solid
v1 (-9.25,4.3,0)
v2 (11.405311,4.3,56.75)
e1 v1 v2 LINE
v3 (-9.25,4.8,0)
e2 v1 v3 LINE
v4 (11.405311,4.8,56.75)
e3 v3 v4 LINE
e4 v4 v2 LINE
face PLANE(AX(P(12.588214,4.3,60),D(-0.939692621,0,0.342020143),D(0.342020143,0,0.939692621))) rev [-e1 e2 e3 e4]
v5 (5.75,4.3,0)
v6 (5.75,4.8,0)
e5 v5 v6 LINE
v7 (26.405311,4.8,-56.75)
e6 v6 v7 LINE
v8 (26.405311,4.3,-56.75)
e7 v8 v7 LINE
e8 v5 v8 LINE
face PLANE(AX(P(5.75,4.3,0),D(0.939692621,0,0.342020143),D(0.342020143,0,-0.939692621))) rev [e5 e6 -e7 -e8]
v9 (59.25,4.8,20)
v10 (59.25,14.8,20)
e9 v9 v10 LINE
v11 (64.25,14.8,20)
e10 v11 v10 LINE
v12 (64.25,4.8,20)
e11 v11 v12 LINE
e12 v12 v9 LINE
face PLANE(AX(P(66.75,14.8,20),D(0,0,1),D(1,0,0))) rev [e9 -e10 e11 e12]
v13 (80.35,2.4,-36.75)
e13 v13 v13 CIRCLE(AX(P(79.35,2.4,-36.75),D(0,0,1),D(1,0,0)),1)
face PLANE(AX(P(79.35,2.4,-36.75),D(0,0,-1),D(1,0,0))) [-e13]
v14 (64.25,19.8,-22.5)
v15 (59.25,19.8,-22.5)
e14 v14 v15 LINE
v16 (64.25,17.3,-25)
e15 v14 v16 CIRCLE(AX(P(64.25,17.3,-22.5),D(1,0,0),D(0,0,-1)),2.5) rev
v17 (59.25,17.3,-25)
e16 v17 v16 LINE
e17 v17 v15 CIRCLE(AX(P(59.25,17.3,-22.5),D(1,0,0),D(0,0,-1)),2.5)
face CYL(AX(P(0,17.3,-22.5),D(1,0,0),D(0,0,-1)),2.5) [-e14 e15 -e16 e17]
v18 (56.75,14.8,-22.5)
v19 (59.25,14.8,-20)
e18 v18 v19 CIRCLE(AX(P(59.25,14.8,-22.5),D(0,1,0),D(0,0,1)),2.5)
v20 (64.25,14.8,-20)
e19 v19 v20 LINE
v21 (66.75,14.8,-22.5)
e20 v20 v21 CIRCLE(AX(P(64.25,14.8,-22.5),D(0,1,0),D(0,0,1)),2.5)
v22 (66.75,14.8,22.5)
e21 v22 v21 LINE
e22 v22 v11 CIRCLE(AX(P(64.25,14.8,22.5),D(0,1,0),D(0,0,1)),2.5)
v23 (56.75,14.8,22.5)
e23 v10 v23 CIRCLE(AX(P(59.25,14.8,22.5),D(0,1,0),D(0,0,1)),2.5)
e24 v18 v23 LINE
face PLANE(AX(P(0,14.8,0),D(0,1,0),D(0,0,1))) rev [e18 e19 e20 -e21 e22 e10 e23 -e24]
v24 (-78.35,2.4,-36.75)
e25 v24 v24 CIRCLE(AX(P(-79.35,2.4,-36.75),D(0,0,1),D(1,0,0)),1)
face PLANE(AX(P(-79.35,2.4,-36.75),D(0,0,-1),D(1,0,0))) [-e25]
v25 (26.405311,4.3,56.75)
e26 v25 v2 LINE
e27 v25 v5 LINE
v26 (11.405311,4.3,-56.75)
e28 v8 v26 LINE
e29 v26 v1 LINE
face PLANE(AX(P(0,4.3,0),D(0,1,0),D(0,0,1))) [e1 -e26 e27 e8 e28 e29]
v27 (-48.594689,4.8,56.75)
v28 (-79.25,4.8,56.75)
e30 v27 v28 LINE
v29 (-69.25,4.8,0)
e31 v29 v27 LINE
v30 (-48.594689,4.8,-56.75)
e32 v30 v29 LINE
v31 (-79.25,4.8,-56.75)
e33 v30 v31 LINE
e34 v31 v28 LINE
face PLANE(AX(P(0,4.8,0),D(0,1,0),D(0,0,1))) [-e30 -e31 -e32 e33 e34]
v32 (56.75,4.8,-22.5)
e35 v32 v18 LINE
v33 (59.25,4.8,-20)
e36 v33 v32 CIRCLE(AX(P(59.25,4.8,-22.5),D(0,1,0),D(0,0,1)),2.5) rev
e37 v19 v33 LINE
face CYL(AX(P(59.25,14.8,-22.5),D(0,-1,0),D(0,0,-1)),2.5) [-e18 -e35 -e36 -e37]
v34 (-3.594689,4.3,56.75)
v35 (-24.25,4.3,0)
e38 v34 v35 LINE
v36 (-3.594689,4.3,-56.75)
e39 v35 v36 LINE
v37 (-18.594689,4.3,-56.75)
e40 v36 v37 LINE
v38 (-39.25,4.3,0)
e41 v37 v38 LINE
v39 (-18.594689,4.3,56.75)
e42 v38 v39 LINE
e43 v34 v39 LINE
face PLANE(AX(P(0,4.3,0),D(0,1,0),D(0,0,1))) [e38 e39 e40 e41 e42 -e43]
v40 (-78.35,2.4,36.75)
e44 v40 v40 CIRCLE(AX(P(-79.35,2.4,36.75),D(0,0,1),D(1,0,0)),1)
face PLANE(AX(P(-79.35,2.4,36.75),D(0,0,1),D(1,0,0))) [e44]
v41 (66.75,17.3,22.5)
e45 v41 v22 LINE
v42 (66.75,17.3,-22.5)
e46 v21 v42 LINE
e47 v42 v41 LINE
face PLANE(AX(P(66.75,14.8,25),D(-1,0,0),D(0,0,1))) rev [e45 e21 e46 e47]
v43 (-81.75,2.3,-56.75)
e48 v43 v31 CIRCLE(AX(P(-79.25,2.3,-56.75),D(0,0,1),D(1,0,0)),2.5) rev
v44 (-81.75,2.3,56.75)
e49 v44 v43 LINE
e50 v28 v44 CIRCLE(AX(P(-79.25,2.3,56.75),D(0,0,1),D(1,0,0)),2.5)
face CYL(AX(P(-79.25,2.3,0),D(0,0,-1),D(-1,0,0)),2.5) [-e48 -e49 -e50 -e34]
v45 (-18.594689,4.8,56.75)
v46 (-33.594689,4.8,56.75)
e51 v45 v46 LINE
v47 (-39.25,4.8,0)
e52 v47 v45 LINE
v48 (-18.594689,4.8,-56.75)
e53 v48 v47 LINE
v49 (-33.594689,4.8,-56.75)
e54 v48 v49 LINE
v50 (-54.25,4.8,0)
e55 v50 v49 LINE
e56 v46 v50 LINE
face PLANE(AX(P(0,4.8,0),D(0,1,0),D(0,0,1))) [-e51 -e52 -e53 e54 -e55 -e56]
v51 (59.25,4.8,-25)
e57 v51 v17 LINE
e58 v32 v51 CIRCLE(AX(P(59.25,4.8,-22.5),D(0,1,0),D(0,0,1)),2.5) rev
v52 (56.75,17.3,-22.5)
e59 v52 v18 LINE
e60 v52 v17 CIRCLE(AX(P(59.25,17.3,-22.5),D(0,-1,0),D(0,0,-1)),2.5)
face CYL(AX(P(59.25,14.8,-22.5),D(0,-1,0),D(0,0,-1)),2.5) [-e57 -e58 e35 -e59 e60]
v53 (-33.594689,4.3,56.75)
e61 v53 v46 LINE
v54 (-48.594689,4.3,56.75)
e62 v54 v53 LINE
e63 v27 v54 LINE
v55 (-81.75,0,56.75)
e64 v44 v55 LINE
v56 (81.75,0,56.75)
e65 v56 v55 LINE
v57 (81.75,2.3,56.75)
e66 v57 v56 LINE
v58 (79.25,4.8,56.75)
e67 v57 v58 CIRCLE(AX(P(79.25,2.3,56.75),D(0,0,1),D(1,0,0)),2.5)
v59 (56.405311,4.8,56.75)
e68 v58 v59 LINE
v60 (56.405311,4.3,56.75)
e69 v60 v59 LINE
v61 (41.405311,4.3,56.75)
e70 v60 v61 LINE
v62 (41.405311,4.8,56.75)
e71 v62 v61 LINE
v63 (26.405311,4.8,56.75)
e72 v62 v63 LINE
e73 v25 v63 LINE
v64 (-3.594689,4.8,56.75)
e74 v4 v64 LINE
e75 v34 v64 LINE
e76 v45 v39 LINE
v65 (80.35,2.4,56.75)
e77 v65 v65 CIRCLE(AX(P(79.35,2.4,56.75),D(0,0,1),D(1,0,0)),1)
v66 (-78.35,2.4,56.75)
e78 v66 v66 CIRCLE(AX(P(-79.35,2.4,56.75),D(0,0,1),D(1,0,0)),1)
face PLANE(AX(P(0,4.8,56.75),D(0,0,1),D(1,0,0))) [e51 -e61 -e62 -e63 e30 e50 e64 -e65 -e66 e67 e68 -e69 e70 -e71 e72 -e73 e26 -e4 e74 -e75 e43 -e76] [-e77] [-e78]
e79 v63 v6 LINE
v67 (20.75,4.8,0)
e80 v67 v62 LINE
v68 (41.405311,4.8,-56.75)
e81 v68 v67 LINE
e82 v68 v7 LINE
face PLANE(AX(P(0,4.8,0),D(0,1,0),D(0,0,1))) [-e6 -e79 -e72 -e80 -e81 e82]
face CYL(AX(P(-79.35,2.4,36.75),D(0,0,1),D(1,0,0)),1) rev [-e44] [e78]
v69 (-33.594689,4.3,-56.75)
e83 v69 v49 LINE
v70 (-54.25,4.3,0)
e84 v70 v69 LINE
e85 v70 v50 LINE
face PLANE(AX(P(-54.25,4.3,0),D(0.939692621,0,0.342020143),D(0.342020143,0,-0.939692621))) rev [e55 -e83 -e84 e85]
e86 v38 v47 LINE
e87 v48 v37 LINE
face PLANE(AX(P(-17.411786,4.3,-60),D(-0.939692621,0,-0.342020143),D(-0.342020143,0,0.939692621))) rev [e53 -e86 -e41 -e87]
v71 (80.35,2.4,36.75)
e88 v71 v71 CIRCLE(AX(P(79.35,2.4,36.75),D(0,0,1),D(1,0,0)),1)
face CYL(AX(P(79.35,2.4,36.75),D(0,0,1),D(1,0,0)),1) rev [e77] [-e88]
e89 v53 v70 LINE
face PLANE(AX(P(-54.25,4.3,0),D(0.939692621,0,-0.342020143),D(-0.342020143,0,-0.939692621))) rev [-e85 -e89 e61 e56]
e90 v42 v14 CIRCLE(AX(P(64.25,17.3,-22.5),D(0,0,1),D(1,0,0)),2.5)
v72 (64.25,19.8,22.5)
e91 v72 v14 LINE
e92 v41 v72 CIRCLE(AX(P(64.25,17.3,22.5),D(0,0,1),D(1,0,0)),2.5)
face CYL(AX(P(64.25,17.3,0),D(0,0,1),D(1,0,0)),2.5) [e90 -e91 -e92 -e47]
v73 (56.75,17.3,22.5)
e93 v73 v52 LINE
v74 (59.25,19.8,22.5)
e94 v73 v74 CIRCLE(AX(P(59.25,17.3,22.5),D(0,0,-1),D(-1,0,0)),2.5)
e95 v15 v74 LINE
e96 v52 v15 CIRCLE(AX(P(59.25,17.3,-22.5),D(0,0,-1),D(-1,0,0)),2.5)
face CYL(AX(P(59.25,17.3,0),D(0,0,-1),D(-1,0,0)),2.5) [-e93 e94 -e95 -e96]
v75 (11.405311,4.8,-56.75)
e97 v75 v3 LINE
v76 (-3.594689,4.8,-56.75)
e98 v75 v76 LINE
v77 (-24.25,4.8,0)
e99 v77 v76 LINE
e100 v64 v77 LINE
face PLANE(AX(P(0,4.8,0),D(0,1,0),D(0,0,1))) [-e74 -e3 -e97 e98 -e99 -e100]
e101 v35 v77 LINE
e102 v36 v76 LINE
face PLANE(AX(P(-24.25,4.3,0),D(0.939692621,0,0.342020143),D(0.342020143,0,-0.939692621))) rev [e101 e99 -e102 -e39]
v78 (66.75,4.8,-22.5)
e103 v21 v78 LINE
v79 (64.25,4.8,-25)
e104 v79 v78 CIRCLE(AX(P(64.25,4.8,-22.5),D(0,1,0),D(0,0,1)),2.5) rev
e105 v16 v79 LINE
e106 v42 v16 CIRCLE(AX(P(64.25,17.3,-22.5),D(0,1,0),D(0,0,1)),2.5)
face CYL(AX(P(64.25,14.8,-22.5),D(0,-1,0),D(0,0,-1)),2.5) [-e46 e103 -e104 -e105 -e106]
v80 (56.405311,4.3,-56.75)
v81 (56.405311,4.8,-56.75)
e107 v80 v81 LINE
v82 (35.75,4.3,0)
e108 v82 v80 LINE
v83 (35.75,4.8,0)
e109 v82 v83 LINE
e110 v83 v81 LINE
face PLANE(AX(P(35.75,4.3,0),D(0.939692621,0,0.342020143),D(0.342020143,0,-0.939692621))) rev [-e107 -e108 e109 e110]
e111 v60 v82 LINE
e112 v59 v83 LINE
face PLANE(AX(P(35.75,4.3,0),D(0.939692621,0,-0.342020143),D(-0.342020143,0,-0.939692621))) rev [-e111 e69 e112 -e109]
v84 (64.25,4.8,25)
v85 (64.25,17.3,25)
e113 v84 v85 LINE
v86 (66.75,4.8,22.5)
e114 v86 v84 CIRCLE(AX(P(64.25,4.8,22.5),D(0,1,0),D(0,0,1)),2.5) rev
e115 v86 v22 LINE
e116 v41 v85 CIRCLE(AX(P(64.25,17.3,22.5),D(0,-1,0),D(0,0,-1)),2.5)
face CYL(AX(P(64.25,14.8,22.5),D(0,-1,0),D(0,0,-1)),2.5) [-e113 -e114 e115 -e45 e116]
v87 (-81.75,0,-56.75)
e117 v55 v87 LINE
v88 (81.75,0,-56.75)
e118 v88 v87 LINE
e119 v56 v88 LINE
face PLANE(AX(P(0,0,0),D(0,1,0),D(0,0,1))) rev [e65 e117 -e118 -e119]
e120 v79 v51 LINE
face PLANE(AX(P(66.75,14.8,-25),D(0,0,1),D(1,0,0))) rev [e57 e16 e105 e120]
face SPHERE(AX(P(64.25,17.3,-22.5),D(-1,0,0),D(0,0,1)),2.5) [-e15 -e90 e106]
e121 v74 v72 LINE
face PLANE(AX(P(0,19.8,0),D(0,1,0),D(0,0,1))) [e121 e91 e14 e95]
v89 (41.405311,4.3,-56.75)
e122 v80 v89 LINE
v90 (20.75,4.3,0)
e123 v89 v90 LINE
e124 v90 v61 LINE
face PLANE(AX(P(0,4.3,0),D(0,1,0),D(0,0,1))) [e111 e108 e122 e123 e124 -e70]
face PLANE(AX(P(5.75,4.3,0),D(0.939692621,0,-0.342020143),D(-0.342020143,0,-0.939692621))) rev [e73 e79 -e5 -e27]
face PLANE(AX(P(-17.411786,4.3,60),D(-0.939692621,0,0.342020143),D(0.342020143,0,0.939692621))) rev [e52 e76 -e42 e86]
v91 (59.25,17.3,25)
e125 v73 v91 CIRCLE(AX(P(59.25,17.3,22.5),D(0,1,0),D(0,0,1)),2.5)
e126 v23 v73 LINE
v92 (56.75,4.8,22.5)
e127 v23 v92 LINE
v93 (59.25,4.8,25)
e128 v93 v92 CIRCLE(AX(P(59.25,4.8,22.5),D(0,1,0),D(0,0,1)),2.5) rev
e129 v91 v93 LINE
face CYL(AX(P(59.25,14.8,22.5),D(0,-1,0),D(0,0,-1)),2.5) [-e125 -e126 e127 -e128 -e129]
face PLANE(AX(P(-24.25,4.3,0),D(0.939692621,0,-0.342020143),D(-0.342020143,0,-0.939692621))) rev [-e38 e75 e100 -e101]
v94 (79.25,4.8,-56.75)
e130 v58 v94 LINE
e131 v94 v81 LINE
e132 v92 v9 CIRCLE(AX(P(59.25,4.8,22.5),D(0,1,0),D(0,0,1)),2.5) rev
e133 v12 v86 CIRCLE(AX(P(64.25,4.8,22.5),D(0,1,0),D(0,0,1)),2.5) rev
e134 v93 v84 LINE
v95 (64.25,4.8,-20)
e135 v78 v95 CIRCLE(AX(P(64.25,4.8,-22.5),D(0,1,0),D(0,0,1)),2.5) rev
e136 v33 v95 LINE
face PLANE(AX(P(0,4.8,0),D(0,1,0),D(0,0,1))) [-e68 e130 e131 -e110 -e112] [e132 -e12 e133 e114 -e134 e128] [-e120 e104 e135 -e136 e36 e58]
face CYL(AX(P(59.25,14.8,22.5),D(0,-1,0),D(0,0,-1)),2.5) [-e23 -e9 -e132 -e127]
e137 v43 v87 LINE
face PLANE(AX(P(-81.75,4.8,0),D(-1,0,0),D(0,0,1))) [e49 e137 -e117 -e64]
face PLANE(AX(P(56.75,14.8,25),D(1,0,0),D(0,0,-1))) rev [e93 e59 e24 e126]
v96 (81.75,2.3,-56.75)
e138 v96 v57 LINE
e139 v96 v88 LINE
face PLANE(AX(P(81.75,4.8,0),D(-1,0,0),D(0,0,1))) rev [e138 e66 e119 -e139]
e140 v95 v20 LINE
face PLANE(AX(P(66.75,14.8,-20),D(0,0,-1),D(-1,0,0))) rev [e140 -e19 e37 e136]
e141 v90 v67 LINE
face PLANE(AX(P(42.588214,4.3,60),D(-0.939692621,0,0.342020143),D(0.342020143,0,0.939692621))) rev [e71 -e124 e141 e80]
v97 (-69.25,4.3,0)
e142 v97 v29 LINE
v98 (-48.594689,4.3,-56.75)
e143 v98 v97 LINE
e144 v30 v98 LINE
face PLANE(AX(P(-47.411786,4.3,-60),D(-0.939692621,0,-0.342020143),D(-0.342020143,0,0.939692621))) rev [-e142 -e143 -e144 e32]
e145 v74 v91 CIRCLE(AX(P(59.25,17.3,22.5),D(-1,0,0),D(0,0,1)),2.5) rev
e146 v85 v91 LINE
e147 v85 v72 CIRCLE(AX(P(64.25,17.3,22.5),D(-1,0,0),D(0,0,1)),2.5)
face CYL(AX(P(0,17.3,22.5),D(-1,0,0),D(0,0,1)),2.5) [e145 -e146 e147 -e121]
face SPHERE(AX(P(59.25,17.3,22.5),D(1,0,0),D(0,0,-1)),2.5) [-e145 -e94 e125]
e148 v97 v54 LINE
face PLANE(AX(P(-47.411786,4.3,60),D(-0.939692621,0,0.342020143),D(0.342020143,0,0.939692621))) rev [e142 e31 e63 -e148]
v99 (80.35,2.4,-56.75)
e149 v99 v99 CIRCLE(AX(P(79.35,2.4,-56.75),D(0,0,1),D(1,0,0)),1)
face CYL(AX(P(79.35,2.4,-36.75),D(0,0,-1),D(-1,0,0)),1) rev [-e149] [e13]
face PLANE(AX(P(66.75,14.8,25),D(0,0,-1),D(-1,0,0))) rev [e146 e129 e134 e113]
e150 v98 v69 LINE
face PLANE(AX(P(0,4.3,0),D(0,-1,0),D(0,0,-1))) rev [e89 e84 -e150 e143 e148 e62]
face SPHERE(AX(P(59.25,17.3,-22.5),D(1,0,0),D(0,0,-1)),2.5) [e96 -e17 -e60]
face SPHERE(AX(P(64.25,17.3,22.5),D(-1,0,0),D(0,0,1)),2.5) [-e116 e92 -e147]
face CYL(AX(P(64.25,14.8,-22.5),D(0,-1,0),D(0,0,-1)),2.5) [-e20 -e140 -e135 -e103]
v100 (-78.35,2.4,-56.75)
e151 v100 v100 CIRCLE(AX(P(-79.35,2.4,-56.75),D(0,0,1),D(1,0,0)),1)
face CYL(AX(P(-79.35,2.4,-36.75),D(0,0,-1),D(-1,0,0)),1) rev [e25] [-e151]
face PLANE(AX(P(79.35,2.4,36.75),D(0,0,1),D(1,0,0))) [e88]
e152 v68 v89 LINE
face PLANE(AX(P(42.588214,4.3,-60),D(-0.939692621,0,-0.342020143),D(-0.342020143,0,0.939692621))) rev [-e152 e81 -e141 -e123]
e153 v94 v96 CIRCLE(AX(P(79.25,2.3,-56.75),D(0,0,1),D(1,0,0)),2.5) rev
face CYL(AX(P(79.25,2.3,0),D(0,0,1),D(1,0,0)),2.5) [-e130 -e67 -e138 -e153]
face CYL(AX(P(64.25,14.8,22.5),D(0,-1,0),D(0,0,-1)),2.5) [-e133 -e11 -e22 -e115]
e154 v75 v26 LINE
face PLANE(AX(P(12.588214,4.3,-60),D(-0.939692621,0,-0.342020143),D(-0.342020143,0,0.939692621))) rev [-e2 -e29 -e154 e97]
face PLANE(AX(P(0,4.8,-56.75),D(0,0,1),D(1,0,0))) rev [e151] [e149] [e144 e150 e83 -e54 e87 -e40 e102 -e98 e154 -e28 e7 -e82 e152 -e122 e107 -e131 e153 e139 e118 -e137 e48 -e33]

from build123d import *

# Parameters (mm, degrees)
ESBO_O1_W                = 163.5
ESBO_O1_H                = 113.5
ESBO_O1_W_2              = 160
ESBO_O1_H_2              = 110
RESSALTO_EXTRUS_O1_DEPTH = 4.8
ESBO_O2_R                = 1
CORTE_EXTRUS_O1_DEPTH    = 20
FILETE1_R                = 2.5
ESBO_O3_W                = 10
ESBO_O3_H                = 5
RESSALTO_EXTRUS_O2_DEPTH = 10
ESBO_O4_W                = 10
ESBO_O4_H                = 50
RESSALTO_EXTRUS_O3_DEPTH = 5
FILETE2_R                = 2.5
FILETE3_R                = 2.5
CORTE_EXTRUS_O2_DEPTH    = 0.5


with BuildPart() as part:
    # Esboço1 → Ressalto-extrusão1 (new body)
    # profile 1 of 2: a face of its own
    with BuildSketch(Plane(origin=(0, 0, 0), x_dir=(1, 0, 0), z_dir=(0, 1, 0))):
        Rectangle(ESBO_O1_W, ESBO_O1_H)
        Rectangle(ESBO_O1_W_2, ESBO_O1_H_2, mode=Mode.SUBTRACT)
    # profile 2 of 2: a face of its own
    with BuildSketch(Plane(origin=(0, 0, 0), x_dir=(1, 0, 0), z_dir=(0, 1, 0))):
        Rectangle(ESBO_O1_W_2, ESBO_O1_H_2)
    extrude(amount=RESSALTO_EXTRUS_O1_DEPTH)

    # Esboço2 → Corte-extrusão1 (cut)
    with BuildSketch(Plane.XY.offset(56.75)):
        with Locations((-79.35, 2.4)):
            Circle(ESBO_O2_R)
        with Locations((79.35, 2.4)):
            Circle(ESBO_O2_R)
    corte_extrus_o1 = extrude(amount=-CORTE_EXTRUS_O1_DEPTH, mode=Mode.SUBTRACT)

    # Espelhar1: Corte-extrusão1 across plane
    add(corte_extrus_o1.mirror(Plane.XY), mode=Mode.SUBTRACT)

    # Filete1
    filete1_edges = [part.edges().sort_by_distance(p)[0] for p in [
        (-81.75, 4.8, 0),
        (81.75, 4.8, 0),
    ]]
    fillet(filete1_edges, radius=FILETE1_R)

    # Esboço3 → Ressalto-extrusão2 (add)
    with BuildSketch(Plane(origin=(0, 4.8, 0), x_dir=(1, 0, 0), z_dir=(0, 1, 0))):
        with Locations((61.75, -22.5)):
            Rectangle(ESBO_O3_W, ESBO_O3_H)
        with Locations((61.75, 22.5)):
            Rectangle(ESBO_O3_W, ESBO_O3_H)
    extrude(amount=RESSALTO_EXTRUS_O2_DEPTH)

    # Esboço4 → Ressalto-extrusão3 (add)
    with BuildSketch(Plane(origin=(0, 14.8, 0), x_dir=(1, 0, 0), z_dir=(0, 1, 0))):
        with Locations((61.75, 0)):
            Rectangle(ESBO_O4_W, ESBO_O4_H)
    extrude(amount=RESSALTO_EXTRUS_O3_DEPTH)

    # Filete2
    filete2_edges = [part.edges().sort_by_distance(p)[0] for p in [
        (61.75, 19.8, -25),
        (61.75, 19.8, 25),
    ]]
    fillet(filete2_edges, radius=FILETE2_R)

    # Filete3
    filete3_edges = [part.edges().sort_by_distance(p)[0] for p in [
        (56.75, 11.05, -25),
        (56.75, 19.067766953, -24.267766953),
        (56.75, 11.05, 25),
        (56.75, 19.067766953, 24.267766953),
        (66.75, 11.05, 25),
        (66.75, 19.067766953, 24.267766953),
        (66.75, 11.05, -25),
        (66.75, 19.067766953, -24.267766953),
        (56.75, 19.8, 0),
        (66.75, 19.8, 0),
        (66.75, 9.8, 20),
        (56.75, 9.8, 20),
        (56.75, 9.8, -20),
        (66.75, 9.8, -20),
    ]]
    fillet(filete3_edges, radius=FILETE3_R - 0.0001)  # a hair under: the kernel refuses the full size

    # Esboço5 → Corte-extrusão2 (cut)
    with BuildSketch(Plane(origin=(0, 4.8, 0), x_dir=(1, 0, 0), z_dir=(0, 1, 0))):
        Polygon((-54.25, 0), (-32.411785944, 60), (-47.411785944, 60), (-69.25, 0), (-47.411785944, -60), (-32.411785944, -60), align=None)
        Polygon((-24.25, 0), (-2.411785944, -60), (-17.411785944, -60), (-39.25, 0), (-17.411785944, 60), (-2.411785944, 60), align=None)
        Polygon((5.75, 0), (27.588214056, -60), (12.588214056, -60), (-9.25, 0), (12.588214056, 60), (27.588214056, 60), align=None)
        Polygon((35.75, 0), (57.588214056, -60), (42.588214056, -60), (20.75, 0), (42.588214056, 60), (57.588214056, 60), align=None)
    extrude(amount=-CORTE_EXTRUS_O2_DEPTH, mode=Mode.SUBTRACT)


solid = part.part
